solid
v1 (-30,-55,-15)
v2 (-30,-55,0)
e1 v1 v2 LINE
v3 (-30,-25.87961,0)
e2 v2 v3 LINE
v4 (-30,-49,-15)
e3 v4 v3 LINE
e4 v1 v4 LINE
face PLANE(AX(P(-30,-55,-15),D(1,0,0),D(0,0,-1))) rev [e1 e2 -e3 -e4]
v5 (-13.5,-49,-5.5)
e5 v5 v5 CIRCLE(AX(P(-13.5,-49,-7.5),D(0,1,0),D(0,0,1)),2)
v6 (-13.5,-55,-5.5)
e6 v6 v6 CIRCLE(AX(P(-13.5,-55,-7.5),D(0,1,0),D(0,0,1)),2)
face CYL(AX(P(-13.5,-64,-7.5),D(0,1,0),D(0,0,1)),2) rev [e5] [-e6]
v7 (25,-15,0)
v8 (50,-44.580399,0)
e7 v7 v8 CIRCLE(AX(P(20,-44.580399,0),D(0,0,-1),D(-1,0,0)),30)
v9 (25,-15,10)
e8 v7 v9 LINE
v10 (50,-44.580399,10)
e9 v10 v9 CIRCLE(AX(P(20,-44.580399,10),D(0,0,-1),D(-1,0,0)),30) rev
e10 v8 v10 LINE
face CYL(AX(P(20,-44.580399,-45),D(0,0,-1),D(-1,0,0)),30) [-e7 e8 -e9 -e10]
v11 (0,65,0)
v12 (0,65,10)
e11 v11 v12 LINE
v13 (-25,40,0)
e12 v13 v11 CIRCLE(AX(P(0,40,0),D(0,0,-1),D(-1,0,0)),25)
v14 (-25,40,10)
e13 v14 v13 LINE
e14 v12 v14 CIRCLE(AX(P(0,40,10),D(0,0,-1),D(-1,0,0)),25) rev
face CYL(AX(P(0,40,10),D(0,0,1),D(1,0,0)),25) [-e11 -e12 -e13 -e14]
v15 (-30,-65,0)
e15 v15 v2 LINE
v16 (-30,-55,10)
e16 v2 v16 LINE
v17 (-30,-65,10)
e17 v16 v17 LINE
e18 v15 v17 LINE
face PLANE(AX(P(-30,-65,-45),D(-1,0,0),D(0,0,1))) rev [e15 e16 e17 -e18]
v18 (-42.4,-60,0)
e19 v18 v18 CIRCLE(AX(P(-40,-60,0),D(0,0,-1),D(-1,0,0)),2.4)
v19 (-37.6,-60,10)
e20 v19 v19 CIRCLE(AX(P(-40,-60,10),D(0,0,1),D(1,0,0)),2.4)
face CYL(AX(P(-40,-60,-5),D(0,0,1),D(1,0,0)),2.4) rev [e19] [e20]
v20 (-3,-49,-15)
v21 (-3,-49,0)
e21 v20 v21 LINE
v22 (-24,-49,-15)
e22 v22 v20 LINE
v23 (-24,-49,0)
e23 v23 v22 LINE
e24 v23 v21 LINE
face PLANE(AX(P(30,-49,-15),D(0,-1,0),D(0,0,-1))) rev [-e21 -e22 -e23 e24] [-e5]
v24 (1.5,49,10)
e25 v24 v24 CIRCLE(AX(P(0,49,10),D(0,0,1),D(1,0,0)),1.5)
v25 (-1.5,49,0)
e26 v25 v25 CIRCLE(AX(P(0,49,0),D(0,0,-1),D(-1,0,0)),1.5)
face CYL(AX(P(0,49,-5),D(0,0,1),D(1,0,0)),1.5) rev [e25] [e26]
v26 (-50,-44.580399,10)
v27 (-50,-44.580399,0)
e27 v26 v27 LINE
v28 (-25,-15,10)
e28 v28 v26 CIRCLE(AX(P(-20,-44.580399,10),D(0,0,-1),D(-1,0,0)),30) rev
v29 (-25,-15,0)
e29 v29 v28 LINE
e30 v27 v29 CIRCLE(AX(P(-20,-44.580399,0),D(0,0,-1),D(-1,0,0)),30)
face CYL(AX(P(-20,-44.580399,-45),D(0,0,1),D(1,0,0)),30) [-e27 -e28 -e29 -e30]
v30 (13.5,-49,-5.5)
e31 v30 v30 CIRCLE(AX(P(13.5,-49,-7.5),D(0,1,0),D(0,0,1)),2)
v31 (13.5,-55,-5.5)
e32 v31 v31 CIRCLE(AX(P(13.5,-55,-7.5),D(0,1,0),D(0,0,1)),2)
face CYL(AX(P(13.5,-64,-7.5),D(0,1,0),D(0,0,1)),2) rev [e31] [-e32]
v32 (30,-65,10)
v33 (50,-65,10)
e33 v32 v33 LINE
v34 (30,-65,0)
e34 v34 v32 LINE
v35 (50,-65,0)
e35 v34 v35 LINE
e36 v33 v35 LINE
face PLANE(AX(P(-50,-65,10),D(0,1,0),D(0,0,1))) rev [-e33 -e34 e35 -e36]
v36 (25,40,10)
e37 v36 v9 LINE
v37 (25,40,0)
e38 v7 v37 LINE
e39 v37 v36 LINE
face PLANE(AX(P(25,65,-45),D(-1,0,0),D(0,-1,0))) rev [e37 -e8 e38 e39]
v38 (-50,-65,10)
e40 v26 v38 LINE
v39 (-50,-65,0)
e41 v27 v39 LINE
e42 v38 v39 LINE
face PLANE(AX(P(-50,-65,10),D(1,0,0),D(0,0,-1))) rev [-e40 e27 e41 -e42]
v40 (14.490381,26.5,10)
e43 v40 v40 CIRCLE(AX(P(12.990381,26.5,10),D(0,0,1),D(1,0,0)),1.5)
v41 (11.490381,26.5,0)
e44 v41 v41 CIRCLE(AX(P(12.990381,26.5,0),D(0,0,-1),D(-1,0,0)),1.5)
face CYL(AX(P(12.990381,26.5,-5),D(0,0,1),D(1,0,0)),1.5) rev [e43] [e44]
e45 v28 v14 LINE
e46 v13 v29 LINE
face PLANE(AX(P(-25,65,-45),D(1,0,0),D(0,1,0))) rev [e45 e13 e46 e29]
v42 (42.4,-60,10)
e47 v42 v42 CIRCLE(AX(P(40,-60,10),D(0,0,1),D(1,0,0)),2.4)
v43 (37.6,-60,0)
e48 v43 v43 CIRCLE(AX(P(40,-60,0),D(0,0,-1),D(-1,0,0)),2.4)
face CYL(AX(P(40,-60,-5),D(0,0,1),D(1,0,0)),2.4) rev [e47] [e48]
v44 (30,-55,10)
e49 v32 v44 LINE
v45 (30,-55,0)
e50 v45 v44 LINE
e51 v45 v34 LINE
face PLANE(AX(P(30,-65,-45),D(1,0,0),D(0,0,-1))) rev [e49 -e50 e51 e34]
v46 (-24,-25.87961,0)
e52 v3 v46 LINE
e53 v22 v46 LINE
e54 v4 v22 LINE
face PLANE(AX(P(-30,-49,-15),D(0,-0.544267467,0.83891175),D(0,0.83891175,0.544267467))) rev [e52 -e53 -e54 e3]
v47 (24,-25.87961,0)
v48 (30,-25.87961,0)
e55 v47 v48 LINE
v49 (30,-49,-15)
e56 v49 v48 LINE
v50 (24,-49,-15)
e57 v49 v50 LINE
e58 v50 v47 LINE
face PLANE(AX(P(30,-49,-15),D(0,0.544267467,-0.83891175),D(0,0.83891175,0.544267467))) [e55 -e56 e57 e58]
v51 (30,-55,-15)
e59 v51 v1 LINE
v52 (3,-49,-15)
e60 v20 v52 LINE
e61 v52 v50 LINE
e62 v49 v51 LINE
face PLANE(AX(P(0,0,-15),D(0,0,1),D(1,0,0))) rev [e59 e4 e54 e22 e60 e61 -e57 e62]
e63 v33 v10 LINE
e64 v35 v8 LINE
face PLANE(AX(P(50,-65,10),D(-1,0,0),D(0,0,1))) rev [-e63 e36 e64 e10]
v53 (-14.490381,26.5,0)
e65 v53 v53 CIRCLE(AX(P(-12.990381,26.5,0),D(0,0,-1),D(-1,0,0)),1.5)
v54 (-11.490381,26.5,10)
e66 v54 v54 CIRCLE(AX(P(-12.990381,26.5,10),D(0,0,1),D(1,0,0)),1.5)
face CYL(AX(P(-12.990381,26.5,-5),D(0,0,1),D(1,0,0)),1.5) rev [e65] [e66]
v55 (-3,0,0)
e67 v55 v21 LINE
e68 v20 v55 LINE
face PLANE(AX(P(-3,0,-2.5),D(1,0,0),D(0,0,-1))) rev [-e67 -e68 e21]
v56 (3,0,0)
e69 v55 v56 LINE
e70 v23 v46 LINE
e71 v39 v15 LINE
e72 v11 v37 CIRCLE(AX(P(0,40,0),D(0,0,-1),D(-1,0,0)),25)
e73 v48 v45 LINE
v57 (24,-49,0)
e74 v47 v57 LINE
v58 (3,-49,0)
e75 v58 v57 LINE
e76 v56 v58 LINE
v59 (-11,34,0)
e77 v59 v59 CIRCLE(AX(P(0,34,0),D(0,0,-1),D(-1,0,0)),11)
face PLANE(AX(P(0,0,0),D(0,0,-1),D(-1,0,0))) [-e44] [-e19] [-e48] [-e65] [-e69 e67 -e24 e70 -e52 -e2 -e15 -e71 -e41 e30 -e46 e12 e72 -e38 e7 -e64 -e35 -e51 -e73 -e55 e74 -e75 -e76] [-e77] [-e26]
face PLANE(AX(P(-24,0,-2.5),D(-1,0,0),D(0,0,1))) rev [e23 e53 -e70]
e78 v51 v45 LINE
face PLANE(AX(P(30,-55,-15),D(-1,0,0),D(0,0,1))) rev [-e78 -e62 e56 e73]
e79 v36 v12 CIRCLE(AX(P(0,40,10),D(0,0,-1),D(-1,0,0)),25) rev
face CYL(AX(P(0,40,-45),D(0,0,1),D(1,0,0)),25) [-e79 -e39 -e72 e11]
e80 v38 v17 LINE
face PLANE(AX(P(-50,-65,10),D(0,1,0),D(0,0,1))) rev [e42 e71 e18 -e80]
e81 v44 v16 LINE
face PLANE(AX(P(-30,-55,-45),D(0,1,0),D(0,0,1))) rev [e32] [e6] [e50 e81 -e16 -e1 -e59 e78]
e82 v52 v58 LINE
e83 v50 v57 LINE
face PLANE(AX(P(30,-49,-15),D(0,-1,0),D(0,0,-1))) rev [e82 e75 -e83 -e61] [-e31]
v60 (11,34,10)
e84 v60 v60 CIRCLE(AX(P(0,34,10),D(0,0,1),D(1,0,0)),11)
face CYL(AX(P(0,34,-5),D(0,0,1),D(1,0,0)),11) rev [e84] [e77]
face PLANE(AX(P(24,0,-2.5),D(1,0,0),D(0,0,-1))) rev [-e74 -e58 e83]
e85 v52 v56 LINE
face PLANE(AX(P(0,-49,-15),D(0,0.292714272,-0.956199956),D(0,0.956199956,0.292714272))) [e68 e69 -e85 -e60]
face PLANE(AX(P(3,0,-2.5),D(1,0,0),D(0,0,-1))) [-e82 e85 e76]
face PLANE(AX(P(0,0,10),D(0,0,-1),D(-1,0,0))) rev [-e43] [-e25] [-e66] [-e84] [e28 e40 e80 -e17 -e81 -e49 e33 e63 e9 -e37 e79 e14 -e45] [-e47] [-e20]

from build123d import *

# Parameters (mm, degrees)
SKETCH2_W           = 100
SKETCH2_H           = 130
BOSS_EXTRUDE1_DEPTH = 10
SKETCH4_W           = 60
SKETCH4_H           = 10
SKETCH4_W_2         = 25
SKETCH4_H_2         = 80
CUT_EXTRUDE1_DEPTH  = 55
SKETCH6_W           = 60
SKETCH6_H           = 6
BOSS_EXTRUDE2_DEPTH = 15
SKETCH10_R          = 2.4
CUT_EXTRUDE3_DEPTH  = 15
FILLET6_R           = 30
FILLET7_R           = 30
RIB9_REACH          = 85.367
SKETCH12_WALL_W     = 219.977831906
SKETCH12_WALL_H     = 6
RIB10_START         = -6
RIB10_DEPTH         = 6
SKETCH14_R          = 2
CUT_EXTRUDE4_DEPTH  = 15
FILLET8_R           = 25
SKETCH15_R          = 11
CUT_EXTRUDE5_DEPTH  = 15
SKETCH17_R          = 1.5
CUT_EXTRUDE6_DEPTH  = 15


# Read off the part's stored shape, not the designer's step: Rib10
# Some blends are built 0.0001 mm under size
with BuildPart() as part:
    # Sketch2 → Boss-Extrude1 (new body)
    with BuildSketch(Plane.XY):
        Rectangle(SKETCH2_W, SKETCH2_H)
    extrude(amount=BOSS_EXTRUDE1_DEPTH)

    # Sketch4 → Cut-Extrude1 (cut)
    with BuildSketch(Plane.XY.offset(10)):
        with Locations((0, -60)):
            Rectangle(SKETCH4_W, SKETCH4_H)
        with Locations((-37.5, 25)):
            Rectangle(SKETCH4_W_2, SKETCH4_H_2)
        with Locations((37.5, 25)):
            Rectangle(SKETCH4_W_2, SKETCH4_H_2)
    extrude(amount=-CUT_EXTRUDE1_DEPTH, mode=Mode.SUBTRACT)

    # Sketch6 → Boss-Extrude2 (add)
    with BuildSketch(Plane(origin=(0, 0, 0), x_dir=(-1, 0, 0), z_dir=(0, 0, -1))):
        with Locations((0, -52)):
            Rectangle(SKETCH6_W, SKETCH6_H)
    extrude(amount=BOSS_EXTRUDE2_DEPTH)

    # Sketch10 → Cut-Extrude3 (cut)
    with BuildSketch(Plane.XY.offset(10)):
        with Locations((-40, -60)):
            Circle(SKETCH10_R)
        with Locations((40, -60)):
            Circle(SKETCH10_R)
    extrude(amount=-CUT_EXTRUDE3_DEPTH, mode=Mode.SUBTRACT)

    # Fillet6
    # the kernel refuses this fillet: 30 mm, written as the material it takes off along each edge
    with BuildSketch(Plane(origin=(50, -15, 83.950997289), x_dir=(-1, 0, 0), z_dir=(0, 0, -1))) as fillet6_piece_1:
        with BuildLine():
            CenterArc((30, -29.580398915), FILLET6_R, 99.594068227, 80.405931773)
            Line((0, -29.580398916), (-0.6, -29.580398916))
            Line((-0.6, -29.580398916), (-0.6, 0))
            Line((-0.6, 0), (0, 0.6))
            ThreePointArc((0, 0.6), (12.5, 0.6), (24.9, 0.591607978))
            Line((24.9, 0.591607978), (25, 0))
        make_face()
    extrude(amount=157.901994578, mode=Mode.SUBTRACT)

    # Fillet7
    # the kernel refuses this fillet: 30 mm, written as the material it takes off along each edge
    with BuildSketch(Plane(origin=(-50, -15, 83.950997289), x_dir=(0, -1, 0), z_dir=(0, 0, -1))) as fillet7_piece_1:
        with BuildLine():
            CenterArc((29.580398916, -30), FILLET7_R, 90, 80.405931773)
            Line((0, -25), (-0.591607978, -24.9))
            ThreePointArc((-0.591607978, -24.9), (-0.6, -12.5), (-0.6, 0))
            Line((-0.6, 0), (0, 0.6))
            Line((0, 0.6), (29.580398916, 0.6))
            Line((29.580398916, 0.6), (29.580398916, 0))
        make_face()
    extrude(amount=157.901994578, mode=Mode.SUBTRACT)

    # Sketch12 wall → Rib9 (add, up to next)
    with BuildSketch(Plane(origin=(0, -24.5, -7.5), x_dir=(0, 0.956199955507, 0.292714272094), z_dir=(0, -0.292714272094, 0.956199955507)), mode=Mode.PRIVATE) as rib9_sk1:
        Rectangle(SKETCH12_WALL_W, SKETCH12_WALL_H)
    rib9_tool1 = extrude(rib9_sk1.sketch, amount=RIB9_REACH, mode=Mode.PRIVATE) - part.part
    add(rib9_tool1.solids().sort_by_distance((0, -24.5, -7.5))[0])

    # Rib10 outline → Rib10 (add)
    with BuildSketch(Plane.ZY.offset(30).offset(RIB10_START)):
        Polygon((0, -25.879609738), (-15, -49), (0, -49), align=None)
    rib10 = extrude(amount=RIB10_DEPTH)

    # Mirror4: Rib10 across plane
    add(rib10.mirror(Plane(origin=(0, 0, 0), x_dir=(0, 0, 1), z_dir=(1, 0, 0))))

    # Sketch14 → Cut-Extrude4 (cut)
    with BuildSketch(Plane(origin=(0, -49, 0), x_dir=(1, 0, 0), z_dir=(0, 1, 0))):
        with Locations(Location((-13.5, 7.5, 0), (0, 0, 270))):
            Circle(SKETCH14_R)
        with Locations(Location((13.5, 7.5, 0), (0, 0, 270))):
            Circle(SKETCH14_R)
    extrude(amount=-CUT_EXTRUDE4_DEPTH, mode=Mode.SUBTRACT)

    # Fillet8
    fillet8_edges = [part.edges().sort_by_distance(p)[0] for p in [
        (25, 65, 5),
        (-25, 65, 5),
    ]]
    fillet(fillet8_edges, radius=FILLET8_R - 0.0001)  # a hair under: the kernel refuses the full size

    # Sketch15 → Cut-Extrude5 (cut)
    with BuildSketch(Plane.XY.offset(10)):
        with Locations((0, 34)):
            Circle(SKETCH15_R)
    extrude(amount=-CUT_EXTRUDE5_DEPTH, mode=Mode.SUBTRACT)

    # Sketch17 → Cut-Extrude6 (cut)
    with BuildSketch(Plane.XY.offset(10)):
        with Locations((0, 49)):
            Circle(SKETCH17_R)
        with Locations((12.990381057, 26.5)):
            Circle(SKETCH17_R)
        with Locations((-12.990381057, 26.5)):
            Circle(SKETCH17_R)
    extrude(amount=-CUT_EXTRUDE6_DEPTH, mode=Mode.SUBTRACT)


solid = part.part
